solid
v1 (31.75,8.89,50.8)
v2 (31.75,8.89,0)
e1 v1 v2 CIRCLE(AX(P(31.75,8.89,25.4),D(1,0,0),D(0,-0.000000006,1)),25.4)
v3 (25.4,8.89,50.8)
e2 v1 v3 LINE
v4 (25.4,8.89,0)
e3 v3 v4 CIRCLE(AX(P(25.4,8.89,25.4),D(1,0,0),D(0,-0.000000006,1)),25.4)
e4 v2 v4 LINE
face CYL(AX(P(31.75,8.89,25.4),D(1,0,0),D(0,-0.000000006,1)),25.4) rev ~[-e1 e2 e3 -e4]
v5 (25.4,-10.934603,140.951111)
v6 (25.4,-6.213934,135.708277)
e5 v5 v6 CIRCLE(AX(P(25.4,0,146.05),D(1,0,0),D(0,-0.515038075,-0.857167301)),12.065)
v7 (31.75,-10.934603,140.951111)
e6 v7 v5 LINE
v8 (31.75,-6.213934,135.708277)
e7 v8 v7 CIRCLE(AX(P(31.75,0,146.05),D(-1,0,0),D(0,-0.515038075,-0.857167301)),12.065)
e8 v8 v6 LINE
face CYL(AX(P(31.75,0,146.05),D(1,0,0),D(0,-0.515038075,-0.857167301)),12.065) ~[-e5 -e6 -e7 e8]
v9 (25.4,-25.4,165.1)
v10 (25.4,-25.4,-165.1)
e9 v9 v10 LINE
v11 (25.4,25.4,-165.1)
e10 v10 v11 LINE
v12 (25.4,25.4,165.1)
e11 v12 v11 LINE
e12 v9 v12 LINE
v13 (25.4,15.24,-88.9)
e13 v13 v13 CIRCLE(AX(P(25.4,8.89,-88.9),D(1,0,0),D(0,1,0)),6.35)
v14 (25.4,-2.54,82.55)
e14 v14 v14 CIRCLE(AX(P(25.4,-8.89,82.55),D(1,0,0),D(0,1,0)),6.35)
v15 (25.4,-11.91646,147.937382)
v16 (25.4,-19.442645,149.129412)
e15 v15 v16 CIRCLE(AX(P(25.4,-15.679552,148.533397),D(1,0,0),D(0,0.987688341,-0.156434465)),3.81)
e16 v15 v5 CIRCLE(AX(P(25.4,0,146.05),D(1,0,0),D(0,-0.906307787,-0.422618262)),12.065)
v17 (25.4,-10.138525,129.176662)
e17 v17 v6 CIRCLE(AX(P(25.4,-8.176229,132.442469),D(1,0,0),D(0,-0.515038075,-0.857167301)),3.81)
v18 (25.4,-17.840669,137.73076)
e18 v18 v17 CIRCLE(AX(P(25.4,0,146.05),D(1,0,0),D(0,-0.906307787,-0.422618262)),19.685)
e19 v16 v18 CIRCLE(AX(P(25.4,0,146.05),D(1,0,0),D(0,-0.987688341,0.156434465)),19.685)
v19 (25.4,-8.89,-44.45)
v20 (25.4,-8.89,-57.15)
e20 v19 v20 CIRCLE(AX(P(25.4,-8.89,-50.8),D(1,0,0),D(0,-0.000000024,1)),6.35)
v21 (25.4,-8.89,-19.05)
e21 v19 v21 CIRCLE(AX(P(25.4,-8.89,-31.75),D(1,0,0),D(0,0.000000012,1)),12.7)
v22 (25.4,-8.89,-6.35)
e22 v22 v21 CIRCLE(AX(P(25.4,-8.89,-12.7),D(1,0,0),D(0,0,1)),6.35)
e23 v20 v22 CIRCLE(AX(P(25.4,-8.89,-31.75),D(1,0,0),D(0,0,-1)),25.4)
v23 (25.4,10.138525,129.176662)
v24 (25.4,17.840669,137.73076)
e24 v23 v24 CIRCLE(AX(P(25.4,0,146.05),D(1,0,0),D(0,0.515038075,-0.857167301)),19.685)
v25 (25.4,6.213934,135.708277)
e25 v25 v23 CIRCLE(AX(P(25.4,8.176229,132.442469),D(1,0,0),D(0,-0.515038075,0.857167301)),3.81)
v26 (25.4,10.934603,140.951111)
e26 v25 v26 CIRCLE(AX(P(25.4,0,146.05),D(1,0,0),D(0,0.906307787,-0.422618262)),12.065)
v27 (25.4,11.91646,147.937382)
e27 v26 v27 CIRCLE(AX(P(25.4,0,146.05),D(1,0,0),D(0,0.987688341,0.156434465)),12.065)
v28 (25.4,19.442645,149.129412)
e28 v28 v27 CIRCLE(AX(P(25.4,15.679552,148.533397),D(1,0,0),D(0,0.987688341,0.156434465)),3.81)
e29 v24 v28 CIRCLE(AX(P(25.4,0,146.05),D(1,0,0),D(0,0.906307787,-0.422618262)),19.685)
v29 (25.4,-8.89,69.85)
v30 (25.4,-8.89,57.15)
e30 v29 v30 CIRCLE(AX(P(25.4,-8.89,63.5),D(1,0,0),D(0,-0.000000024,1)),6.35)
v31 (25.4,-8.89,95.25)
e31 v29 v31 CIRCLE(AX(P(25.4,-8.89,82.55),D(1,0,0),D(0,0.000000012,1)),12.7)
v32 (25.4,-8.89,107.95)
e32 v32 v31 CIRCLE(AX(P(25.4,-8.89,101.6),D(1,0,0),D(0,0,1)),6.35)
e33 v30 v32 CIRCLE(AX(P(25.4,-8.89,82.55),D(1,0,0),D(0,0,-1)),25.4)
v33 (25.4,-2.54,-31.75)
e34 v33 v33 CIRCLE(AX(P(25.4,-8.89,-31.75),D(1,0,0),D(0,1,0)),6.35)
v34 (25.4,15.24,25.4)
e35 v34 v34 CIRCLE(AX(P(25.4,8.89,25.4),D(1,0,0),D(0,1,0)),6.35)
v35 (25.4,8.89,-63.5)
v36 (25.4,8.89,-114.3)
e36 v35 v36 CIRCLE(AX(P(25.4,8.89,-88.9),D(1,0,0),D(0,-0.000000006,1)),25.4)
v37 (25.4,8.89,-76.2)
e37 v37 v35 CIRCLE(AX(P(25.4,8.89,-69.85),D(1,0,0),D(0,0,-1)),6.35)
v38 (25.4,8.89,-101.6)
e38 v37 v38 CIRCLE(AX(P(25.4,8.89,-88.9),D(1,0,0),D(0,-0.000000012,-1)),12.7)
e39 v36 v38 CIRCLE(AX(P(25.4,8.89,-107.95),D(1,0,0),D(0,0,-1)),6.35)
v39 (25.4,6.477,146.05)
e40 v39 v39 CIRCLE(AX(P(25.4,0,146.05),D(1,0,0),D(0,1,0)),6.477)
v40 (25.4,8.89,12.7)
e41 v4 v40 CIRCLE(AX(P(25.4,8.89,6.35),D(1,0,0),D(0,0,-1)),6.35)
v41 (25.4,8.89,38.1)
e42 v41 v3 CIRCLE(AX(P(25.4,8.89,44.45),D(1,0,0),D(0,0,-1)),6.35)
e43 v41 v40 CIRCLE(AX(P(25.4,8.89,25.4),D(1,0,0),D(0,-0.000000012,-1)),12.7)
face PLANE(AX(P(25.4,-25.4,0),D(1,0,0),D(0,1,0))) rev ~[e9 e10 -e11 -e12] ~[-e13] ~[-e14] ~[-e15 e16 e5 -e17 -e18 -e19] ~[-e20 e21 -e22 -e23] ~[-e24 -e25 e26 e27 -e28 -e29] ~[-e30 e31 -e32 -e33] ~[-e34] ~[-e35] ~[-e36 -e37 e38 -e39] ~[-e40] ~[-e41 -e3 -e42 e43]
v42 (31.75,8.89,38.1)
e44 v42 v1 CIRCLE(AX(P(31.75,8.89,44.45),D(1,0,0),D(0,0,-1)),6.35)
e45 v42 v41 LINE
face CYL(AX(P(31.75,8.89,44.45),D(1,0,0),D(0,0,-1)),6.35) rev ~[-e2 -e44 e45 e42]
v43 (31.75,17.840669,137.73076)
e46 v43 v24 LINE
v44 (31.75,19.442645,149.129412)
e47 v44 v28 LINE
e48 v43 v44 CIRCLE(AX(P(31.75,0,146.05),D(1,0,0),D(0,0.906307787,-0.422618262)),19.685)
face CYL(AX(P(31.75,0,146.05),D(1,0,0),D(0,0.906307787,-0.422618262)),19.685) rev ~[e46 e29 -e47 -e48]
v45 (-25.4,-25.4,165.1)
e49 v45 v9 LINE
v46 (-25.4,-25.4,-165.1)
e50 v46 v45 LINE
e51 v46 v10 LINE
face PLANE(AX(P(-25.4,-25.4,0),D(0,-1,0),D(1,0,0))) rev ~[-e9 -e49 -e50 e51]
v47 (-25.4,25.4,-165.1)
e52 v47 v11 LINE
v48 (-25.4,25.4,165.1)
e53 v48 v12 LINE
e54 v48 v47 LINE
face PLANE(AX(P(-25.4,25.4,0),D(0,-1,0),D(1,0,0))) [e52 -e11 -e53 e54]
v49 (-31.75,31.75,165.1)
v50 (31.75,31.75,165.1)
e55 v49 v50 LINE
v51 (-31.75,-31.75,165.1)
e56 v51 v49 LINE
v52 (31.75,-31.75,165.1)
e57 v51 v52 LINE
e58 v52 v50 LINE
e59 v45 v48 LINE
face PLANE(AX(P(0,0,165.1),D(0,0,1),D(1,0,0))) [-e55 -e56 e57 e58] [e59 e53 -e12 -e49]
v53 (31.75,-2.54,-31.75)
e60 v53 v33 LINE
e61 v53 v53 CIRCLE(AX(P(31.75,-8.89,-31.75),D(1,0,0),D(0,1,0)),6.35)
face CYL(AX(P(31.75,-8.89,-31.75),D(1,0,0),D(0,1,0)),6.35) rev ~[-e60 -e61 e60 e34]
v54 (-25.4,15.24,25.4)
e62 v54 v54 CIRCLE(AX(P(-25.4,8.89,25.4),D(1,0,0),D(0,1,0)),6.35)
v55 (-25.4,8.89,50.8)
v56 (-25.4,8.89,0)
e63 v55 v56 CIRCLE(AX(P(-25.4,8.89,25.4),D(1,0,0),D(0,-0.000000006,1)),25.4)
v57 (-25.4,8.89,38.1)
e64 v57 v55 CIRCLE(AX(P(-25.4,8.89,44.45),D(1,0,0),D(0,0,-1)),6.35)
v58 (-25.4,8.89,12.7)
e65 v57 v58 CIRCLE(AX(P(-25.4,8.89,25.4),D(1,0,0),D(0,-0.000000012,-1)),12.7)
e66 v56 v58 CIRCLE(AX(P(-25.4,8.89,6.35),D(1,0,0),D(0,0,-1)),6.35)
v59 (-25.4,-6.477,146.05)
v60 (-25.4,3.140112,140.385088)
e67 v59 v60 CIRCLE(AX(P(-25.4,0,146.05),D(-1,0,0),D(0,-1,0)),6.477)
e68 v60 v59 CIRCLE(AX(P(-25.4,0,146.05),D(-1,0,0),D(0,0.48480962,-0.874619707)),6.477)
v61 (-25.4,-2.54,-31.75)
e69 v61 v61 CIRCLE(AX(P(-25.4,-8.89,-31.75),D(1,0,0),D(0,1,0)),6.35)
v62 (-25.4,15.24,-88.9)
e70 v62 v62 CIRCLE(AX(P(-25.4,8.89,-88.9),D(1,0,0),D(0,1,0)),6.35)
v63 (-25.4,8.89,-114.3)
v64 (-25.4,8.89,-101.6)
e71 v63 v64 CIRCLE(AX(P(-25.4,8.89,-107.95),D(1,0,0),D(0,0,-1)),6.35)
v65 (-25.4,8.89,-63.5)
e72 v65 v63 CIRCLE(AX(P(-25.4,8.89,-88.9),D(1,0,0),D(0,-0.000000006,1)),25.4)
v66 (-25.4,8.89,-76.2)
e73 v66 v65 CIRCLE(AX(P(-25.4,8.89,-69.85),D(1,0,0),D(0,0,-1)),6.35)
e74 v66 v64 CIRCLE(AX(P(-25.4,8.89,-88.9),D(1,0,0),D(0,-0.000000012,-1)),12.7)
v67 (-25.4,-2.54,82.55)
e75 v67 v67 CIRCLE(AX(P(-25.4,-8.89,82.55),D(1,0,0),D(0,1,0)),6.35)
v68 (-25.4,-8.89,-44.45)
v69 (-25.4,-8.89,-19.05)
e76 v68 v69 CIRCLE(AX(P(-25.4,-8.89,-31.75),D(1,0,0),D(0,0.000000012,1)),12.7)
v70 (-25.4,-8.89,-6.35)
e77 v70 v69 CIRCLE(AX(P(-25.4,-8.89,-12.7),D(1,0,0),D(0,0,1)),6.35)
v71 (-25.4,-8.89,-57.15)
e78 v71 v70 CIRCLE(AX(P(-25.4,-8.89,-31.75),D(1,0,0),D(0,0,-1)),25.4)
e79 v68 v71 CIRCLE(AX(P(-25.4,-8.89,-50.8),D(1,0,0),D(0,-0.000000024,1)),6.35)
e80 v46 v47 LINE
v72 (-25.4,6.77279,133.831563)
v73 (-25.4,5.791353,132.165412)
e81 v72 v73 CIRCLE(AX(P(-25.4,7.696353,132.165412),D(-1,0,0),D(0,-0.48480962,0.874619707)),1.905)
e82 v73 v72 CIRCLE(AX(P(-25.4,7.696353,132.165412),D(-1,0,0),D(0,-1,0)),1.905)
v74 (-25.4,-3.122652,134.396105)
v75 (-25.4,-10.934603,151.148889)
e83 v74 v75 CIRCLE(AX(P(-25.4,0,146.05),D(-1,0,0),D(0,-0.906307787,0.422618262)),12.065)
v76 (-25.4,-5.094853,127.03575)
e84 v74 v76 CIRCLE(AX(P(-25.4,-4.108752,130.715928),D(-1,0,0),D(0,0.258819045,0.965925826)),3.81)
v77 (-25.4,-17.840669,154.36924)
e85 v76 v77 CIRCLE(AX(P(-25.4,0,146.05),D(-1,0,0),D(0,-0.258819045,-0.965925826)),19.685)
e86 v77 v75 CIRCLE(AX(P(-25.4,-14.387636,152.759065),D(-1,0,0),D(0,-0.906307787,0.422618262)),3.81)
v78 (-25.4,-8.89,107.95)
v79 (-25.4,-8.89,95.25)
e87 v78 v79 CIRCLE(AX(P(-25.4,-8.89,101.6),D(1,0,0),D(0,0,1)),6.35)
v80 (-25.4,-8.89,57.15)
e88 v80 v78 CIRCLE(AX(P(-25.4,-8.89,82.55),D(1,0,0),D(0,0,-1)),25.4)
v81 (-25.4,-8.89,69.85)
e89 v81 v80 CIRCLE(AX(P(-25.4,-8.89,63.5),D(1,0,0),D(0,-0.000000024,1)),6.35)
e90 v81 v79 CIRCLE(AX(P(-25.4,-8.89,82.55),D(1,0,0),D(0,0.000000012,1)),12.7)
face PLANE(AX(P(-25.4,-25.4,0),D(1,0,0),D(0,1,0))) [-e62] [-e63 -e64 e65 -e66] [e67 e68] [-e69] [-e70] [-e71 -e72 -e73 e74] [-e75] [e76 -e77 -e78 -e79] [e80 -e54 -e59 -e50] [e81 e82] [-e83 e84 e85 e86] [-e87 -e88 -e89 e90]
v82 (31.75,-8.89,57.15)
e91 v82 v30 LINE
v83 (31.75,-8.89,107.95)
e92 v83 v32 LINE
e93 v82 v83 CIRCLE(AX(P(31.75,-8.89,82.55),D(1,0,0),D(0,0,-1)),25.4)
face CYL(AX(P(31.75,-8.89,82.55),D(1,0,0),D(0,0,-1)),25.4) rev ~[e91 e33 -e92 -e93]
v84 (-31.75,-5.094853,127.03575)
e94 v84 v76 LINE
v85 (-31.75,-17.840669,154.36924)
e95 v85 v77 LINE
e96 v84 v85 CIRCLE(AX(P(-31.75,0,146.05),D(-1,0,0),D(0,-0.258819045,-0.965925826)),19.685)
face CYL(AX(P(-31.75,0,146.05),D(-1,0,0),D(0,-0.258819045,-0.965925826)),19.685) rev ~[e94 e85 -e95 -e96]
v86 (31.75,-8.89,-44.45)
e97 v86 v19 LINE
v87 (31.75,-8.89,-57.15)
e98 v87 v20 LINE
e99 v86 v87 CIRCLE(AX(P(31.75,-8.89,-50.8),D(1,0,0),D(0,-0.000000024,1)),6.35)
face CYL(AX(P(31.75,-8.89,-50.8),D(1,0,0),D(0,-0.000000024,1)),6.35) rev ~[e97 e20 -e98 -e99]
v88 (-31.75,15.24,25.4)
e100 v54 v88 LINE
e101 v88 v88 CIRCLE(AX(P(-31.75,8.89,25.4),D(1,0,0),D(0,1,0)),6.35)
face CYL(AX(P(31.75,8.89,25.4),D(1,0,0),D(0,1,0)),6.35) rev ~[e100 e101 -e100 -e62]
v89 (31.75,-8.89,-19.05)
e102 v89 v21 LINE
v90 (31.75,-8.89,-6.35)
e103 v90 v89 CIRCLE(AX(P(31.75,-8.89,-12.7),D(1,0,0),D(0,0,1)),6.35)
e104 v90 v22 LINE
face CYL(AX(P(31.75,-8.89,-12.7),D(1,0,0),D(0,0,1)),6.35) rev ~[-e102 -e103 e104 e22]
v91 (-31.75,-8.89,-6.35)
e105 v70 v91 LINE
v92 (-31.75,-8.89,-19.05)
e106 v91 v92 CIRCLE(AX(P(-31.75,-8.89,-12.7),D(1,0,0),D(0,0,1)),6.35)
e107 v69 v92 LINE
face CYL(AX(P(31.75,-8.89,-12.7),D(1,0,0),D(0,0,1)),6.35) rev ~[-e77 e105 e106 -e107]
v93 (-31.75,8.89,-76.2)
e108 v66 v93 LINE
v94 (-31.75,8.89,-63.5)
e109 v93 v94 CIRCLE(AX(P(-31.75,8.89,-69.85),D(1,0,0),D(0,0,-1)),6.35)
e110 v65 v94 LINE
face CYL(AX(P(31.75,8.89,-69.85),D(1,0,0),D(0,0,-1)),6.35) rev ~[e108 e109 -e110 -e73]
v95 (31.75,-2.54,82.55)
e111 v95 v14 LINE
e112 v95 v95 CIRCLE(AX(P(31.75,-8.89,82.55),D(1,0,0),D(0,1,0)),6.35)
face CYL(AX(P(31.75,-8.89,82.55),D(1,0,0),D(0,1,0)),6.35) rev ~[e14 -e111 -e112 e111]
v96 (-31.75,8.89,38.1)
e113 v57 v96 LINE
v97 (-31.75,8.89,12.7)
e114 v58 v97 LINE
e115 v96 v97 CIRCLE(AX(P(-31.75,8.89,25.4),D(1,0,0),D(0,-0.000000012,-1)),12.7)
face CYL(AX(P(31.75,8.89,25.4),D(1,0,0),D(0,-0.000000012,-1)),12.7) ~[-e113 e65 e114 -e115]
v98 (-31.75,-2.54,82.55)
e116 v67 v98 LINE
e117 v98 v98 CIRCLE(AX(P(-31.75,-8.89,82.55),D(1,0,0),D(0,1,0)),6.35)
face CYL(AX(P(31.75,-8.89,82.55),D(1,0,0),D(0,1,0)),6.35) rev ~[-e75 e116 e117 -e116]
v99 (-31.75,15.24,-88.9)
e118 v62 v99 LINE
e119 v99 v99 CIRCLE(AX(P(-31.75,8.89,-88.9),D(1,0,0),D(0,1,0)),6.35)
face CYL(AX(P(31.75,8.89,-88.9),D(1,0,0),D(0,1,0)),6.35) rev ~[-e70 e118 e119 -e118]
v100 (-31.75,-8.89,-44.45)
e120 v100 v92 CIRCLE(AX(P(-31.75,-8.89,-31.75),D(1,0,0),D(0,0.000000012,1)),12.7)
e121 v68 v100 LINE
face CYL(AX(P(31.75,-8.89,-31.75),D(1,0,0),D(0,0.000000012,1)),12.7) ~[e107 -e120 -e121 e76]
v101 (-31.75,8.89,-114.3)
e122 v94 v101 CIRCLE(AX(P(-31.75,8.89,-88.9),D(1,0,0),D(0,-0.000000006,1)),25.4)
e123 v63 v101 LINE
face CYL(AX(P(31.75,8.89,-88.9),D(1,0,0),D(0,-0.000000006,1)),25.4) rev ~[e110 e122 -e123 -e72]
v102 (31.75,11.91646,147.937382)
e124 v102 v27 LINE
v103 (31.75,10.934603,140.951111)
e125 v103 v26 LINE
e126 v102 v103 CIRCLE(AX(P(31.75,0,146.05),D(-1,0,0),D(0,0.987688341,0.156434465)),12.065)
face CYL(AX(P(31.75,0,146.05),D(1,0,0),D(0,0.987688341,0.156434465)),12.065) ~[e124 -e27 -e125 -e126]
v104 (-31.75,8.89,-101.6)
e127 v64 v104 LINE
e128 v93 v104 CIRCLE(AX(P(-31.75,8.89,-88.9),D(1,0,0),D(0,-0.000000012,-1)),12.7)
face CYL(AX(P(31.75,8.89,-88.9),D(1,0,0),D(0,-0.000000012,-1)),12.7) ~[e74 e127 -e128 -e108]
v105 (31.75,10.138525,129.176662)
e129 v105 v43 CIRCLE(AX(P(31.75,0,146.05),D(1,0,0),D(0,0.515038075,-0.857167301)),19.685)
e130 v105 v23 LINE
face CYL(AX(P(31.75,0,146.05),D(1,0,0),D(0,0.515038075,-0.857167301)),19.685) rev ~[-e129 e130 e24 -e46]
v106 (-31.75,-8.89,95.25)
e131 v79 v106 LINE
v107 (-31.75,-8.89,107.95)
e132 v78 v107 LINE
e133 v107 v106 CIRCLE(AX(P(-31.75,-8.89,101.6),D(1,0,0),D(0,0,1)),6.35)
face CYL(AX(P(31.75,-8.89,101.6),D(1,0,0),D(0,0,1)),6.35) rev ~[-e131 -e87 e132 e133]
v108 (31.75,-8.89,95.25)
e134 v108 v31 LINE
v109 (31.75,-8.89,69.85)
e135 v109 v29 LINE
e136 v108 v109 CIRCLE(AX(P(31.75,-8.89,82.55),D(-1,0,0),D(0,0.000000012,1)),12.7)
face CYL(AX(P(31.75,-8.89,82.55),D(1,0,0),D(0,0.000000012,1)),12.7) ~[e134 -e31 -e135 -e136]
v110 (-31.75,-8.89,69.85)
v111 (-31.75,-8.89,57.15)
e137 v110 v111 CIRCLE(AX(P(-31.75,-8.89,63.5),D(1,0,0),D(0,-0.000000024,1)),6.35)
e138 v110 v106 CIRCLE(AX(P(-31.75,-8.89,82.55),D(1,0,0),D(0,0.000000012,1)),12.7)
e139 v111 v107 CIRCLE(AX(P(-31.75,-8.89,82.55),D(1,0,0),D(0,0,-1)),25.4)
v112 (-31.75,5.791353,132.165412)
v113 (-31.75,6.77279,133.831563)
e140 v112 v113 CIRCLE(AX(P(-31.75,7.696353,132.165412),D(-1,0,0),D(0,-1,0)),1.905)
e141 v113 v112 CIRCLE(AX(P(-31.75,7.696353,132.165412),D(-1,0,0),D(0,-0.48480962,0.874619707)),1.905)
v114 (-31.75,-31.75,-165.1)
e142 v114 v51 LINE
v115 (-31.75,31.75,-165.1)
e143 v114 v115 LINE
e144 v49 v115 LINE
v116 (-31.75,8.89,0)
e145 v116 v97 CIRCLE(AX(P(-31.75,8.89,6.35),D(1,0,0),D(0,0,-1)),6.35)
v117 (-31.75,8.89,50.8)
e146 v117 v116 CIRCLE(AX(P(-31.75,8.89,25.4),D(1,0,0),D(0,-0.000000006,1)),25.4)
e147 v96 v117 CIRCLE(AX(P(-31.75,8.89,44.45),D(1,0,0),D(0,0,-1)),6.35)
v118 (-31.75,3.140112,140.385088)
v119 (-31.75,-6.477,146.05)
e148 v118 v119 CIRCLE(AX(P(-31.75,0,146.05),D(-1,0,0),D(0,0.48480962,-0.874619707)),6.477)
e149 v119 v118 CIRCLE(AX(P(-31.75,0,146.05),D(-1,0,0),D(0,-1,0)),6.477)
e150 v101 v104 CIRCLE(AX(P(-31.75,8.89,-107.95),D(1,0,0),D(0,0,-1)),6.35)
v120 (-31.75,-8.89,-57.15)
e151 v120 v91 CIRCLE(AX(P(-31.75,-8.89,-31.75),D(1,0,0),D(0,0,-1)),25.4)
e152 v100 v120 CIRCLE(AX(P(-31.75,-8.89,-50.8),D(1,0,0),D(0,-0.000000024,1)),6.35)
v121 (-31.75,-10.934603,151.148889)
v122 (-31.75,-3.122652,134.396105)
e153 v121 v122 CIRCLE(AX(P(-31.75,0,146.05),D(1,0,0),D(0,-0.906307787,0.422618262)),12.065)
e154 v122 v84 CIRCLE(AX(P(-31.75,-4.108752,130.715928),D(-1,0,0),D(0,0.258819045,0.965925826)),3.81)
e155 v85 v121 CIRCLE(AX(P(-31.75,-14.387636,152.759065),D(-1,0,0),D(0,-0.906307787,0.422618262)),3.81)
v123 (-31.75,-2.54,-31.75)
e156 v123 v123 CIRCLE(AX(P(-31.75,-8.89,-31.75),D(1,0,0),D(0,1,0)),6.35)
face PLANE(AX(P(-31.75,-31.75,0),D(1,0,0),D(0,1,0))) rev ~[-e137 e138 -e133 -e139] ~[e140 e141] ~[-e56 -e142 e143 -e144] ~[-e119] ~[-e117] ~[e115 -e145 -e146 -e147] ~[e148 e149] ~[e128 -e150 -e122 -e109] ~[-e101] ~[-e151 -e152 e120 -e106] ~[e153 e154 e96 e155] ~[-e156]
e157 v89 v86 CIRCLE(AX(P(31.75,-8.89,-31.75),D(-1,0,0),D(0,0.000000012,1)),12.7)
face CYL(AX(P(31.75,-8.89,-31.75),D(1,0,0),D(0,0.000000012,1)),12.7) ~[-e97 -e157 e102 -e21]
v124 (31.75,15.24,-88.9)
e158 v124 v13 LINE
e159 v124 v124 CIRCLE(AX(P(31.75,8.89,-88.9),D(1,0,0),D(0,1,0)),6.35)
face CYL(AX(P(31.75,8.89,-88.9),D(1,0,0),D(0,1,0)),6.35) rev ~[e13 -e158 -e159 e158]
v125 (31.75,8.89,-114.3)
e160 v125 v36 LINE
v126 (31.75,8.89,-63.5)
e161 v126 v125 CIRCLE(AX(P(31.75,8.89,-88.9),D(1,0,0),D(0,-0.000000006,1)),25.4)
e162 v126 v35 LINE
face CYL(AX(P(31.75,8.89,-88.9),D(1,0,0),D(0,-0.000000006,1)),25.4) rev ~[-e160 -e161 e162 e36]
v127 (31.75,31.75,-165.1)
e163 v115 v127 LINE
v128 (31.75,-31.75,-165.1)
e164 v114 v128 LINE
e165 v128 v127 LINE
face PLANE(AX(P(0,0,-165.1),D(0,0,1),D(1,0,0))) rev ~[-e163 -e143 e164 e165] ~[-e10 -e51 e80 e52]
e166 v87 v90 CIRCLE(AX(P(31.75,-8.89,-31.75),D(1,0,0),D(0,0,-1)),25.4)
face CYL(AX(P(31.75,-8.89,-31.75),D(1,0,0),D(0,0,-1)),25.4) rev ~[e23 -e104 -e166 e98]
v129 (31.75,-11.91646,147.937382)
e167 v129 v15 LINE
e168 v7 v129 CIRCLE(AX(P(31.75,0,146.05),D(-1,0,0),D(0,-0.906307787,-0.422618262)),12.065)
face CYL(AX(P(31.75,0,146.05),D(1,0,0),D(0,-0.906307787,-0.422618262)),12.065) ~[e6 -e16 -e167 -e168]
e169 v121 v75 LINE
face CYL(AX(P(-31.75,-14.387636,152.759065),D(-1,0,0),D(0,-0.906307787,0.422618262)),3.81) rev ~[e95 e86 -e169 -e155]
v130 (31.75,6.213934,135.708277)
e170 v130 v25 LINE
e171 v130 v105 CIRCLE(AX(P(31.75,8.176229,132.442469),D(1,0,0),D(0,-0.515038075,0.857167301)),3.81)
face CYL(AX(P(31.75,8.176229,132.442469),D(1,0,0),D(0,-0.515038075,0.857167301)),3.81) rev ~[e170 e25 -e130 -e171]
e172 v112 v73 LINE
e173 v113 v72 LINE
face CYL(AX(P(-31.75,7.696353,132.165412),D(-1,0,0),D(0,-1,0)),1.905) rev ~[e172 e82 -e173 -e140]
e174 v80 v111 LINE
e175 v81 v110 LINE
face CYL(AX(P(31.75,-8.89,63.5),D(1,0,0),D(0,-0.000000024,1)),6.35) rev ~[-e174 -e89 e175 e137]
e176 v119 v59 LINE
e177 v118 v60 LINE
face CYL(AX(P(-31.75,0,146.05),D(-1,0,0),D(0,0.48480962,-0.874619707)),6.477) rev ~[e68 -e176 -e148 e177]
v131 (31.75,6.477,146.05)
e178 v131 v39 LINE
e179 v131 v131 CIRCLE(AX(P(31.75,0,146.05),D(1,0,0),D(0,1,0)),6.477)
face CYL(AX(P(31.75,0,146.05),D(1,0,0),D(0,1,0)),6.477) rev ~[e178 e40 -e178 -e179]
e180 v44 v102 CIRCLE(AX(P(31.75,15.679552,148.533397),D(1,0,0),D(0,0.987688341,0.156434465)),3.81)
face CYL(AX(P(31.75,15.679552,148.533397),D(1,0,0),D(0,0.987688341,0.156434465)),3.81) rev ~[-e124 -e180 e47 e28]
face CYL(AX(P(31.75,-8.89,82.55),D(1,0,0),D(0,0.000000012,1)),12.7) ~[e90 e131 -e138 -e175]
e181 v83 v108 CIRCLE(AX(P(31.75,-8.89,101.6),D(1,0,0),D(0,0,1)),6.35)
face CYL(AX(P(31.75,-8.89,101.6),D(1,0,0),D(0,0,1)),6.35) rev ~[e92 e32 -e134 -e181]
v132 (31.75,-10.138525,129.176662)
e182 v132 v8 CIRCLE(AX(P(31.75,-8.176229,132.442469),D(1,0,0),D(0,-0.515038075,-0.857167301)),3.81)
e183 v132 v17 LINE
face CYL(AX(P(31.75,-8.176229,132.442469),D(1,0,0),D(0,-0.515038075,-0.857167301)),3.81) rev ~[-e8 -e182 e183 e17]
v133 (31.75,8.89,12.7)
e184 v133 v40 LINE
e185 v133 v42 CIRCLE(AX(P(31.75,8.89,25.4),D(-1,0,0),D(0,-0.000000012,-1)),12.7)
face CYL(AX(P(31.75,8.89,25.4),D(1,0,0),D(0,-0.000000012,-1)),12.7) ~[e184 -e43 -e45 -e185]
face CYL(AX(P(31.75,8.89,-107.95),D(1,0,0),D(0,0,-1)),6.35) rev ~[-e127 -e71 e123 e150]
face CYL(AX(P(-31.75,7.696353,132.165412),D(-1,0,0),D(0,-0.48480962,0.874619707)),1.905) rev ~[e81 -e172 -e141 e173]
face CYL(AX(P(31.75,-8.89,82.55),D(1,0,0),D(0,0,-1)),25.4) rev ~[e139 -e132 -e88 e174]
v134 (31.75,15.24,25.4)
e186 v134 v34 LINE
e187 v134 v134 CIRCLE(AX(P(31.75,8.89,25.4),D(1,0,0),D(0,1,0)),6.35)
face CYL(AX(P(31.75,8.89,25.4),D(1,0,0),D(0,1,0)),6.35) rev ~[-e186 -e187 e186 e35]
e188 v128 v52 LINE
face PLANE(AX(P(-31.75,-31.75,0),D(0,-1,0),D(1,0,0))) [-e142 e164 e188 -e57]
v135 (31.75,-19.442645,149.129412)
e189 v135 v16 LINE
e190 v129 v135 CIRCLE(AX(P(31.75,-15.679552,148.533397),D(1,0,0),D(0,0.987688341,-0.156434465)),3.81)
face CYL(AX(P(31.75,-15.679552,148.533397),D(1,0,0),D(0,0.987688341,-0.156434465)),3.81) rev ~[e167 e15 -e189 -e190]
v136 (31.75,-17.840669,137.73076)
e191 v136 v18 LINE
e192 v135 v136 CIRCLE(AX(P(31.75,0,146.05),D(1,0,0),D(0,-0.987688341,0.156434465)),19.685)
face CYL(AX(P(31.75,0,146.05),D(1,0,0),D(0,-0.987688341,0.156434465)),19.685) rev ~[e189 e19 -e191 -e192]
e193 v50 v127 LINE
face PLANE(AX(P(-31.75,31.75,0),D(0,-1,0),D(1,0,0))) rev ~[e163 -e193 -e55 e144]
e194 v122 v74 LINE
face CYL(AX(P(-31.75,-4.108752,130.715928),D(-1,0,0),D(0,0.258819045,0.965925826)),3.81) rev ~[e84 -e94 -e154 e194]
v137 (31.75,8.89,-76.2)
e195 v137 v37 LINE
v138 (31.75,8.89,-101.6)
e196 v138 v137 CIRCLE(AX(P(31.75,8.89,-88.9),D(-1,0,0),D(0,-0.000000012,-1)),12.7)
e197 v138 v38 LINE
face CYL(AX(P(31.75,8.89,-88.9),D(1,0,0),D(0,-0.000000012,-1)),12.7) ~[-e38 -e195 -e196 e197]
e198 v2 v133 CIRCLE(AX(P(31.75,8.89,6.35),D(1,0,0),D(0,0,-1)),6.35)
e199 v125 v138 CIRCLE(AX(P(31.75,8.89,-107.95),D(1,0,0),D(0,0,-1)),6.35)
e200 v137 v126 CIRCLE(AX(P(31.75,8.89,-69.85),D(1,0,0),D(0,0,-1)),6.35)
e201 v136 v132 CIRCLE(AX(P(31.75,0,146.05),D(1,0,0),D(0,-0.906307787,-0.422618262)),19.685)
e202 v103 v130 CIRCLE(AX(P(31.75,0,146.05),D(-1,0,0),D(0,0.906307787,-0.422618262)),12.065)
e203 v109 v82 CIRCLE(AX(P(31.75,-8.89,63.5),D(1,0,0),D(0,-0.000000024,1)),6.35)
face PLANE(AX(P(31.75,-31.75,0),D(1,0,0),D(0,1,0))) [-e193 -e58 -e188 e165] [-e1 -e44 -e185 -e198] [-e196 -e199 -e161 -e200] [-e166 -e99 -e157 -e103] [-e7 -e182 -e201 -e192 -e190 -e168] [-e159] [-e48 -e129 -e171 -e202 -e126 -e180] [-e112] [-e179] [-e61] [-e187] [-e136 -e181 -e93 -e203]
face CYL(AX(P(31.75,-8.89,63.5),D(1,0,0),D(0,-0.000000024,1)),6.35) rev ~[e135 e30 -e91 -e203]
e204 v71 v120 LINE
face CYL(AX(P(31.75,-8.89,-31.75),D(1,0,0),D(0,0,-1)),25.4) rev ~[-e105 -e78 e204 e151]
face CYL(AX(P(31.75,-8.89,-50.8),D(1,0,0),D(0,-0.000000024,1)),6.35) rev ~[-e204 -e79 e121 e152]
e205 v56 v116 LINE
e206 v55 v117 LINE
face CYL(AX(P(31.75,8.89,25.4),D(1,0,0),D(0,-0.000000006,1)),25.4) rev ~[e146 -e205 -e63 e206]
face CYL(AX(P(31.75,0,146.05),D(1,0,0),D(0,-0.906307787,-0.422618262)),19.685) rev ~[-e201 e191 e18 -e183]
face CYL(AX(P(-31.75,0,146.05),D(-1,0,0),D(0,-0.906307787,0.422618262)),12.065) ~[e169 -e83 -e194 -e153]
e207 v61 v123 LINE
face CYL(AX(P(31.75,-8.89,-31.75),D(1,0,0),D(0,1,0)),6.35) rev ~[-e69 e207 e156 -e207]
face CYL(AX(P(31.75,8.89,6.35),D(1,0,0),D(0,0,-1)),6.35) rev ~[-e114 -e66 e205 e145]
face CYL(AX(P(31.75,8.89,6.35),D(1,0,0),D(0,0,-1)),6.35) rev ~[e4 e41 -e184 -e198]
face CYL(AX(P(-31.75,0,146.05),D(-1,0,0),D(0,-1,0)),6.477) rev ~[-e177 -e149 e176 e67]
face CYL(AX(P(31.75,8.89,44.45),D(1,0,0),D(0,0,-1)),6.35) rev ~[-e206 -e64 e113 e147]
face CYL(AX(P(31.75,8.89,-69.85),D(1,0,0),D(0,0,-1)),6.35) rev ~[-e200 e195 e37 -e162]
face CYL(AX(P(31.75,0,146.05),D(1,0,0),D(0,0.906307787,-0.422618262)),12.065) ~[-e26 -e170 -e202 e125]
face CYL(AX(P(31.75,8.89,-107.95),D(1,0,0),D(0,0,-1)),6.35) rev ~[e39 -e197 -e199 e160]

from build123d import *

# Parameters (mm, degrees)
F0_W     = 63.5
F0_H     = 63.5
F0_W_2   = 50.8
F0_H_2   = 50.8
F1_DEPTH = 165.1
F3_R     = 6.477
F4_DEPTH = 25.4
F6_DEPTH = 25.4
F7_R     = 6.35
F8_DEPTH = 63.501


# Not quite as in the source:
# - ends of sketch curves that miss each other by under 0.0002 mm in the source are joined


with BuildPart() as f1:
    # F0 (on Top) → F1 (new body, symmetric)
    with BuildSketch(Plane.XY):
        Rectangle(F0_W, F0_H)
        Rectangle(F0_W_2, F0_H_2, mode=Mode.SUBTRACT)
    extrude(amount=F1_DEPTH, both=True)

    # F3 (on face) → F4 (cut)
    with BuildSketch(Plane.YZ.offset(31.75)):
        with Locations((0, 146.05)):
            Circle(F3_R)
        with BuildLine():
            ThreePointArc((10.1385245046, 129.1766616857), (14.6288058895, 132.8781640138), (17.8406687878, 137.7307595176))
            ThreePointArc((17.8406687878, 137.7307595176), (19.4934269332, 143.3103775076), (19.4426449846, 149.1294124443))
            ThreePointArc((19.4426449846, 149.1294124443), (15.0835370951, 152.2964897102), (11.9164598293, 147.9373818207))
            ThreePointArc((11.9164598293, 147.9373818207), (11.9475842494, 144.3708765369), (10.9346034506, 140.9511106721))
            ThreePointArc((10.9346034506, 140.9511106721), (8.9660423194, 137.9769392343), (6.2139343738, 135.708276517))
            ThreePointArc((6.2139343738, 135.708276517), (4.9104220235, 130.4801740359), (10.1385245046, 129.1766616857))
        make_face()
        with BuildLine():
            ThreePointArc((-10.1385245046, 129.1766616857), (-4.9104220235, 130.4801740359), (-6.2139343738, 135.708276517))
            ThreePointArc((-6.2139343738, 135.708276517), (-8.9660423194, 137.9769392343), (-10.9346034506, 140.9511106721))
            ThreePointArc((-10.9346034506, 140.9511106721), (-11.9475842494, 144.3708765369), (-11.9164598293, 147.9373818207))
            ThreePointArc((-11.9164598293, 147.9373818207), (-15.0835370951, 152.2964897102), (-19.4426449846, 149.1294124443))
            ThreePointArc((-19.4426449846, 149.1294124443), (-19.4934269332, 143.3103775076), (-17.8406687878, 137.7307595176))
            ThreePointArc((-17.8406687878, 137.7307595176), (-14.6288058895, 132.8781640138), (-10.1385245046, 129.1766616857))
        make_face()
    extrude(amount=-F4_DEPTH, mode=Mode.SUBTRACT)

    # F5 (on face) → F6 (cut)
    with BuildSketch(Plane(origin=(-31.75, 0, 0), x_dir=(0, -1, 0), z_dir=(-1, 0, 0))):
        with BuildLine():
            ThreePointArc((-3.1401119103, 140.3850881569), (3.2873259769, 140.4692279278), (6.477, 146.05))
            ThreePointArc((6.477, 146.05), (-3.2873259769, 151.6307720722), (-3.1401119103, 140.3850881569))
        make_face()
        with BuildLine():
            ThreePointArc((-5.7913527214, 132.1654121492), (-6.0549491708, 133.1322727306), (-6.7727903948, 133.8315626913))
            ThreePointArc((-6.7727903948, 133.8315626913), (-9.3377562721, 131.1985515677), (-5.7913527214, 132.1654121492))
        make_face()
        with BuildLine():
            ThreePointArc((3.1226517792, 134.3961049058), (0.4285749428, 129.7298269458), (5.0948529028, 127.0357501095))
            ThreePointArc((5.0948529028, 127.0357501095), (17.8406687878, 137.7307595176), (17.8406687878, 154.3692404824))
            ThreePointArc((17.8406687878, 154.3692404824), (12.777460542, 156.2120975737), (10.9346034506, 151.1488893279))
            ThreePointArc((10.9346034506, 151.1488893279), (10.9346034506, 140.9511106721), (3.1226517792, 134.3961049058))
        make_face()
    extrude(amount=-F6_DEPTH, mode=Mode.SUBTRACT)

    # F7 (on face) → F8 (cut, through all)
    with BuildSketch(Plane.YZ.offset(31.75)):
        with BuildLine():
            ThreePointArc((-8.89, 107.949999693), (-15.239999693, 101.6), (-8.89, 95.250000307))
            ThreePointArc((-8.89, 95.250000307), (3.81, 82.55), (-8.89, 69.85))
            ThreePointArc((-8.89, 69.85), (-15.239999693, 63.5), (-8.89, 57.150000307))
            ThreePointArc((-8.89, 57.150000307), (16.509999693, 82.55), (-8.89, 107.949999693))
        make_face()
        with BuildLine():
            ThreePointArc((8.89, 3.07e-07), (15.239999693, 6.35), (8.89, 12.699999693))
            ThreePointArc((8.89, 12.699999693), (-3.81, 25.4), (8.89, 38.1))
            ThreePointArc((8.89, 38.1), (15.24, 44.45), (8.89, 50.8))
            ThreePointArc((8.89, 50.8), (-16.509999693, 25.4), (8.89, 3.07e-07))
        make_face()
        with BuildLine():
            ThreePointArc((-8.89, -6.350000307), (-15.239999693, -12.7), (-8.89, -19.049999693))
            ThreePointArc((-8.89, -19.049999693), (3.81, -31.75), (-8.89, -44.45))
            ThreePointArc((-8.89, -44.45), (-15.239999693, -50.8), (-8.89, -57.149999693))
            ThreePointArc((-8.89, -57.149999693), (16.509999693, -31.75), (-8.89, -6.350000307))
        make_face()
        with BuildLine():
            ThreePointArc((8.89, -114.299999693), (15.239999693, -107.95), (8.89, -101.600000307))
            ThreePointArc((8.89, -101.600000307), (-3.81, -88.9), (8.89, -76.2))
            ThreePointArc((8.89, -76.2), (15.24, -69.85), (8.89, -63.5))
            ThreePointArc((8.89, -63.5), (-16.509999693, -88.9), (8.89, -114.299999693))
        make_face()
        with Locations((-8.89, 82.55)):
            Circle(F7_R)
        with Locations((8.89, 25.4)):
            Circle(F7_R)
        with Locations((8.89, -88.9)):
            Circle(F7_R)
        with Locations((-8.89, -31.75)):
            Circle(F7_R)
    extrude(amount=-F8_DEPTH, mode=Mode.SUBTRACT)


solid = f1.part
